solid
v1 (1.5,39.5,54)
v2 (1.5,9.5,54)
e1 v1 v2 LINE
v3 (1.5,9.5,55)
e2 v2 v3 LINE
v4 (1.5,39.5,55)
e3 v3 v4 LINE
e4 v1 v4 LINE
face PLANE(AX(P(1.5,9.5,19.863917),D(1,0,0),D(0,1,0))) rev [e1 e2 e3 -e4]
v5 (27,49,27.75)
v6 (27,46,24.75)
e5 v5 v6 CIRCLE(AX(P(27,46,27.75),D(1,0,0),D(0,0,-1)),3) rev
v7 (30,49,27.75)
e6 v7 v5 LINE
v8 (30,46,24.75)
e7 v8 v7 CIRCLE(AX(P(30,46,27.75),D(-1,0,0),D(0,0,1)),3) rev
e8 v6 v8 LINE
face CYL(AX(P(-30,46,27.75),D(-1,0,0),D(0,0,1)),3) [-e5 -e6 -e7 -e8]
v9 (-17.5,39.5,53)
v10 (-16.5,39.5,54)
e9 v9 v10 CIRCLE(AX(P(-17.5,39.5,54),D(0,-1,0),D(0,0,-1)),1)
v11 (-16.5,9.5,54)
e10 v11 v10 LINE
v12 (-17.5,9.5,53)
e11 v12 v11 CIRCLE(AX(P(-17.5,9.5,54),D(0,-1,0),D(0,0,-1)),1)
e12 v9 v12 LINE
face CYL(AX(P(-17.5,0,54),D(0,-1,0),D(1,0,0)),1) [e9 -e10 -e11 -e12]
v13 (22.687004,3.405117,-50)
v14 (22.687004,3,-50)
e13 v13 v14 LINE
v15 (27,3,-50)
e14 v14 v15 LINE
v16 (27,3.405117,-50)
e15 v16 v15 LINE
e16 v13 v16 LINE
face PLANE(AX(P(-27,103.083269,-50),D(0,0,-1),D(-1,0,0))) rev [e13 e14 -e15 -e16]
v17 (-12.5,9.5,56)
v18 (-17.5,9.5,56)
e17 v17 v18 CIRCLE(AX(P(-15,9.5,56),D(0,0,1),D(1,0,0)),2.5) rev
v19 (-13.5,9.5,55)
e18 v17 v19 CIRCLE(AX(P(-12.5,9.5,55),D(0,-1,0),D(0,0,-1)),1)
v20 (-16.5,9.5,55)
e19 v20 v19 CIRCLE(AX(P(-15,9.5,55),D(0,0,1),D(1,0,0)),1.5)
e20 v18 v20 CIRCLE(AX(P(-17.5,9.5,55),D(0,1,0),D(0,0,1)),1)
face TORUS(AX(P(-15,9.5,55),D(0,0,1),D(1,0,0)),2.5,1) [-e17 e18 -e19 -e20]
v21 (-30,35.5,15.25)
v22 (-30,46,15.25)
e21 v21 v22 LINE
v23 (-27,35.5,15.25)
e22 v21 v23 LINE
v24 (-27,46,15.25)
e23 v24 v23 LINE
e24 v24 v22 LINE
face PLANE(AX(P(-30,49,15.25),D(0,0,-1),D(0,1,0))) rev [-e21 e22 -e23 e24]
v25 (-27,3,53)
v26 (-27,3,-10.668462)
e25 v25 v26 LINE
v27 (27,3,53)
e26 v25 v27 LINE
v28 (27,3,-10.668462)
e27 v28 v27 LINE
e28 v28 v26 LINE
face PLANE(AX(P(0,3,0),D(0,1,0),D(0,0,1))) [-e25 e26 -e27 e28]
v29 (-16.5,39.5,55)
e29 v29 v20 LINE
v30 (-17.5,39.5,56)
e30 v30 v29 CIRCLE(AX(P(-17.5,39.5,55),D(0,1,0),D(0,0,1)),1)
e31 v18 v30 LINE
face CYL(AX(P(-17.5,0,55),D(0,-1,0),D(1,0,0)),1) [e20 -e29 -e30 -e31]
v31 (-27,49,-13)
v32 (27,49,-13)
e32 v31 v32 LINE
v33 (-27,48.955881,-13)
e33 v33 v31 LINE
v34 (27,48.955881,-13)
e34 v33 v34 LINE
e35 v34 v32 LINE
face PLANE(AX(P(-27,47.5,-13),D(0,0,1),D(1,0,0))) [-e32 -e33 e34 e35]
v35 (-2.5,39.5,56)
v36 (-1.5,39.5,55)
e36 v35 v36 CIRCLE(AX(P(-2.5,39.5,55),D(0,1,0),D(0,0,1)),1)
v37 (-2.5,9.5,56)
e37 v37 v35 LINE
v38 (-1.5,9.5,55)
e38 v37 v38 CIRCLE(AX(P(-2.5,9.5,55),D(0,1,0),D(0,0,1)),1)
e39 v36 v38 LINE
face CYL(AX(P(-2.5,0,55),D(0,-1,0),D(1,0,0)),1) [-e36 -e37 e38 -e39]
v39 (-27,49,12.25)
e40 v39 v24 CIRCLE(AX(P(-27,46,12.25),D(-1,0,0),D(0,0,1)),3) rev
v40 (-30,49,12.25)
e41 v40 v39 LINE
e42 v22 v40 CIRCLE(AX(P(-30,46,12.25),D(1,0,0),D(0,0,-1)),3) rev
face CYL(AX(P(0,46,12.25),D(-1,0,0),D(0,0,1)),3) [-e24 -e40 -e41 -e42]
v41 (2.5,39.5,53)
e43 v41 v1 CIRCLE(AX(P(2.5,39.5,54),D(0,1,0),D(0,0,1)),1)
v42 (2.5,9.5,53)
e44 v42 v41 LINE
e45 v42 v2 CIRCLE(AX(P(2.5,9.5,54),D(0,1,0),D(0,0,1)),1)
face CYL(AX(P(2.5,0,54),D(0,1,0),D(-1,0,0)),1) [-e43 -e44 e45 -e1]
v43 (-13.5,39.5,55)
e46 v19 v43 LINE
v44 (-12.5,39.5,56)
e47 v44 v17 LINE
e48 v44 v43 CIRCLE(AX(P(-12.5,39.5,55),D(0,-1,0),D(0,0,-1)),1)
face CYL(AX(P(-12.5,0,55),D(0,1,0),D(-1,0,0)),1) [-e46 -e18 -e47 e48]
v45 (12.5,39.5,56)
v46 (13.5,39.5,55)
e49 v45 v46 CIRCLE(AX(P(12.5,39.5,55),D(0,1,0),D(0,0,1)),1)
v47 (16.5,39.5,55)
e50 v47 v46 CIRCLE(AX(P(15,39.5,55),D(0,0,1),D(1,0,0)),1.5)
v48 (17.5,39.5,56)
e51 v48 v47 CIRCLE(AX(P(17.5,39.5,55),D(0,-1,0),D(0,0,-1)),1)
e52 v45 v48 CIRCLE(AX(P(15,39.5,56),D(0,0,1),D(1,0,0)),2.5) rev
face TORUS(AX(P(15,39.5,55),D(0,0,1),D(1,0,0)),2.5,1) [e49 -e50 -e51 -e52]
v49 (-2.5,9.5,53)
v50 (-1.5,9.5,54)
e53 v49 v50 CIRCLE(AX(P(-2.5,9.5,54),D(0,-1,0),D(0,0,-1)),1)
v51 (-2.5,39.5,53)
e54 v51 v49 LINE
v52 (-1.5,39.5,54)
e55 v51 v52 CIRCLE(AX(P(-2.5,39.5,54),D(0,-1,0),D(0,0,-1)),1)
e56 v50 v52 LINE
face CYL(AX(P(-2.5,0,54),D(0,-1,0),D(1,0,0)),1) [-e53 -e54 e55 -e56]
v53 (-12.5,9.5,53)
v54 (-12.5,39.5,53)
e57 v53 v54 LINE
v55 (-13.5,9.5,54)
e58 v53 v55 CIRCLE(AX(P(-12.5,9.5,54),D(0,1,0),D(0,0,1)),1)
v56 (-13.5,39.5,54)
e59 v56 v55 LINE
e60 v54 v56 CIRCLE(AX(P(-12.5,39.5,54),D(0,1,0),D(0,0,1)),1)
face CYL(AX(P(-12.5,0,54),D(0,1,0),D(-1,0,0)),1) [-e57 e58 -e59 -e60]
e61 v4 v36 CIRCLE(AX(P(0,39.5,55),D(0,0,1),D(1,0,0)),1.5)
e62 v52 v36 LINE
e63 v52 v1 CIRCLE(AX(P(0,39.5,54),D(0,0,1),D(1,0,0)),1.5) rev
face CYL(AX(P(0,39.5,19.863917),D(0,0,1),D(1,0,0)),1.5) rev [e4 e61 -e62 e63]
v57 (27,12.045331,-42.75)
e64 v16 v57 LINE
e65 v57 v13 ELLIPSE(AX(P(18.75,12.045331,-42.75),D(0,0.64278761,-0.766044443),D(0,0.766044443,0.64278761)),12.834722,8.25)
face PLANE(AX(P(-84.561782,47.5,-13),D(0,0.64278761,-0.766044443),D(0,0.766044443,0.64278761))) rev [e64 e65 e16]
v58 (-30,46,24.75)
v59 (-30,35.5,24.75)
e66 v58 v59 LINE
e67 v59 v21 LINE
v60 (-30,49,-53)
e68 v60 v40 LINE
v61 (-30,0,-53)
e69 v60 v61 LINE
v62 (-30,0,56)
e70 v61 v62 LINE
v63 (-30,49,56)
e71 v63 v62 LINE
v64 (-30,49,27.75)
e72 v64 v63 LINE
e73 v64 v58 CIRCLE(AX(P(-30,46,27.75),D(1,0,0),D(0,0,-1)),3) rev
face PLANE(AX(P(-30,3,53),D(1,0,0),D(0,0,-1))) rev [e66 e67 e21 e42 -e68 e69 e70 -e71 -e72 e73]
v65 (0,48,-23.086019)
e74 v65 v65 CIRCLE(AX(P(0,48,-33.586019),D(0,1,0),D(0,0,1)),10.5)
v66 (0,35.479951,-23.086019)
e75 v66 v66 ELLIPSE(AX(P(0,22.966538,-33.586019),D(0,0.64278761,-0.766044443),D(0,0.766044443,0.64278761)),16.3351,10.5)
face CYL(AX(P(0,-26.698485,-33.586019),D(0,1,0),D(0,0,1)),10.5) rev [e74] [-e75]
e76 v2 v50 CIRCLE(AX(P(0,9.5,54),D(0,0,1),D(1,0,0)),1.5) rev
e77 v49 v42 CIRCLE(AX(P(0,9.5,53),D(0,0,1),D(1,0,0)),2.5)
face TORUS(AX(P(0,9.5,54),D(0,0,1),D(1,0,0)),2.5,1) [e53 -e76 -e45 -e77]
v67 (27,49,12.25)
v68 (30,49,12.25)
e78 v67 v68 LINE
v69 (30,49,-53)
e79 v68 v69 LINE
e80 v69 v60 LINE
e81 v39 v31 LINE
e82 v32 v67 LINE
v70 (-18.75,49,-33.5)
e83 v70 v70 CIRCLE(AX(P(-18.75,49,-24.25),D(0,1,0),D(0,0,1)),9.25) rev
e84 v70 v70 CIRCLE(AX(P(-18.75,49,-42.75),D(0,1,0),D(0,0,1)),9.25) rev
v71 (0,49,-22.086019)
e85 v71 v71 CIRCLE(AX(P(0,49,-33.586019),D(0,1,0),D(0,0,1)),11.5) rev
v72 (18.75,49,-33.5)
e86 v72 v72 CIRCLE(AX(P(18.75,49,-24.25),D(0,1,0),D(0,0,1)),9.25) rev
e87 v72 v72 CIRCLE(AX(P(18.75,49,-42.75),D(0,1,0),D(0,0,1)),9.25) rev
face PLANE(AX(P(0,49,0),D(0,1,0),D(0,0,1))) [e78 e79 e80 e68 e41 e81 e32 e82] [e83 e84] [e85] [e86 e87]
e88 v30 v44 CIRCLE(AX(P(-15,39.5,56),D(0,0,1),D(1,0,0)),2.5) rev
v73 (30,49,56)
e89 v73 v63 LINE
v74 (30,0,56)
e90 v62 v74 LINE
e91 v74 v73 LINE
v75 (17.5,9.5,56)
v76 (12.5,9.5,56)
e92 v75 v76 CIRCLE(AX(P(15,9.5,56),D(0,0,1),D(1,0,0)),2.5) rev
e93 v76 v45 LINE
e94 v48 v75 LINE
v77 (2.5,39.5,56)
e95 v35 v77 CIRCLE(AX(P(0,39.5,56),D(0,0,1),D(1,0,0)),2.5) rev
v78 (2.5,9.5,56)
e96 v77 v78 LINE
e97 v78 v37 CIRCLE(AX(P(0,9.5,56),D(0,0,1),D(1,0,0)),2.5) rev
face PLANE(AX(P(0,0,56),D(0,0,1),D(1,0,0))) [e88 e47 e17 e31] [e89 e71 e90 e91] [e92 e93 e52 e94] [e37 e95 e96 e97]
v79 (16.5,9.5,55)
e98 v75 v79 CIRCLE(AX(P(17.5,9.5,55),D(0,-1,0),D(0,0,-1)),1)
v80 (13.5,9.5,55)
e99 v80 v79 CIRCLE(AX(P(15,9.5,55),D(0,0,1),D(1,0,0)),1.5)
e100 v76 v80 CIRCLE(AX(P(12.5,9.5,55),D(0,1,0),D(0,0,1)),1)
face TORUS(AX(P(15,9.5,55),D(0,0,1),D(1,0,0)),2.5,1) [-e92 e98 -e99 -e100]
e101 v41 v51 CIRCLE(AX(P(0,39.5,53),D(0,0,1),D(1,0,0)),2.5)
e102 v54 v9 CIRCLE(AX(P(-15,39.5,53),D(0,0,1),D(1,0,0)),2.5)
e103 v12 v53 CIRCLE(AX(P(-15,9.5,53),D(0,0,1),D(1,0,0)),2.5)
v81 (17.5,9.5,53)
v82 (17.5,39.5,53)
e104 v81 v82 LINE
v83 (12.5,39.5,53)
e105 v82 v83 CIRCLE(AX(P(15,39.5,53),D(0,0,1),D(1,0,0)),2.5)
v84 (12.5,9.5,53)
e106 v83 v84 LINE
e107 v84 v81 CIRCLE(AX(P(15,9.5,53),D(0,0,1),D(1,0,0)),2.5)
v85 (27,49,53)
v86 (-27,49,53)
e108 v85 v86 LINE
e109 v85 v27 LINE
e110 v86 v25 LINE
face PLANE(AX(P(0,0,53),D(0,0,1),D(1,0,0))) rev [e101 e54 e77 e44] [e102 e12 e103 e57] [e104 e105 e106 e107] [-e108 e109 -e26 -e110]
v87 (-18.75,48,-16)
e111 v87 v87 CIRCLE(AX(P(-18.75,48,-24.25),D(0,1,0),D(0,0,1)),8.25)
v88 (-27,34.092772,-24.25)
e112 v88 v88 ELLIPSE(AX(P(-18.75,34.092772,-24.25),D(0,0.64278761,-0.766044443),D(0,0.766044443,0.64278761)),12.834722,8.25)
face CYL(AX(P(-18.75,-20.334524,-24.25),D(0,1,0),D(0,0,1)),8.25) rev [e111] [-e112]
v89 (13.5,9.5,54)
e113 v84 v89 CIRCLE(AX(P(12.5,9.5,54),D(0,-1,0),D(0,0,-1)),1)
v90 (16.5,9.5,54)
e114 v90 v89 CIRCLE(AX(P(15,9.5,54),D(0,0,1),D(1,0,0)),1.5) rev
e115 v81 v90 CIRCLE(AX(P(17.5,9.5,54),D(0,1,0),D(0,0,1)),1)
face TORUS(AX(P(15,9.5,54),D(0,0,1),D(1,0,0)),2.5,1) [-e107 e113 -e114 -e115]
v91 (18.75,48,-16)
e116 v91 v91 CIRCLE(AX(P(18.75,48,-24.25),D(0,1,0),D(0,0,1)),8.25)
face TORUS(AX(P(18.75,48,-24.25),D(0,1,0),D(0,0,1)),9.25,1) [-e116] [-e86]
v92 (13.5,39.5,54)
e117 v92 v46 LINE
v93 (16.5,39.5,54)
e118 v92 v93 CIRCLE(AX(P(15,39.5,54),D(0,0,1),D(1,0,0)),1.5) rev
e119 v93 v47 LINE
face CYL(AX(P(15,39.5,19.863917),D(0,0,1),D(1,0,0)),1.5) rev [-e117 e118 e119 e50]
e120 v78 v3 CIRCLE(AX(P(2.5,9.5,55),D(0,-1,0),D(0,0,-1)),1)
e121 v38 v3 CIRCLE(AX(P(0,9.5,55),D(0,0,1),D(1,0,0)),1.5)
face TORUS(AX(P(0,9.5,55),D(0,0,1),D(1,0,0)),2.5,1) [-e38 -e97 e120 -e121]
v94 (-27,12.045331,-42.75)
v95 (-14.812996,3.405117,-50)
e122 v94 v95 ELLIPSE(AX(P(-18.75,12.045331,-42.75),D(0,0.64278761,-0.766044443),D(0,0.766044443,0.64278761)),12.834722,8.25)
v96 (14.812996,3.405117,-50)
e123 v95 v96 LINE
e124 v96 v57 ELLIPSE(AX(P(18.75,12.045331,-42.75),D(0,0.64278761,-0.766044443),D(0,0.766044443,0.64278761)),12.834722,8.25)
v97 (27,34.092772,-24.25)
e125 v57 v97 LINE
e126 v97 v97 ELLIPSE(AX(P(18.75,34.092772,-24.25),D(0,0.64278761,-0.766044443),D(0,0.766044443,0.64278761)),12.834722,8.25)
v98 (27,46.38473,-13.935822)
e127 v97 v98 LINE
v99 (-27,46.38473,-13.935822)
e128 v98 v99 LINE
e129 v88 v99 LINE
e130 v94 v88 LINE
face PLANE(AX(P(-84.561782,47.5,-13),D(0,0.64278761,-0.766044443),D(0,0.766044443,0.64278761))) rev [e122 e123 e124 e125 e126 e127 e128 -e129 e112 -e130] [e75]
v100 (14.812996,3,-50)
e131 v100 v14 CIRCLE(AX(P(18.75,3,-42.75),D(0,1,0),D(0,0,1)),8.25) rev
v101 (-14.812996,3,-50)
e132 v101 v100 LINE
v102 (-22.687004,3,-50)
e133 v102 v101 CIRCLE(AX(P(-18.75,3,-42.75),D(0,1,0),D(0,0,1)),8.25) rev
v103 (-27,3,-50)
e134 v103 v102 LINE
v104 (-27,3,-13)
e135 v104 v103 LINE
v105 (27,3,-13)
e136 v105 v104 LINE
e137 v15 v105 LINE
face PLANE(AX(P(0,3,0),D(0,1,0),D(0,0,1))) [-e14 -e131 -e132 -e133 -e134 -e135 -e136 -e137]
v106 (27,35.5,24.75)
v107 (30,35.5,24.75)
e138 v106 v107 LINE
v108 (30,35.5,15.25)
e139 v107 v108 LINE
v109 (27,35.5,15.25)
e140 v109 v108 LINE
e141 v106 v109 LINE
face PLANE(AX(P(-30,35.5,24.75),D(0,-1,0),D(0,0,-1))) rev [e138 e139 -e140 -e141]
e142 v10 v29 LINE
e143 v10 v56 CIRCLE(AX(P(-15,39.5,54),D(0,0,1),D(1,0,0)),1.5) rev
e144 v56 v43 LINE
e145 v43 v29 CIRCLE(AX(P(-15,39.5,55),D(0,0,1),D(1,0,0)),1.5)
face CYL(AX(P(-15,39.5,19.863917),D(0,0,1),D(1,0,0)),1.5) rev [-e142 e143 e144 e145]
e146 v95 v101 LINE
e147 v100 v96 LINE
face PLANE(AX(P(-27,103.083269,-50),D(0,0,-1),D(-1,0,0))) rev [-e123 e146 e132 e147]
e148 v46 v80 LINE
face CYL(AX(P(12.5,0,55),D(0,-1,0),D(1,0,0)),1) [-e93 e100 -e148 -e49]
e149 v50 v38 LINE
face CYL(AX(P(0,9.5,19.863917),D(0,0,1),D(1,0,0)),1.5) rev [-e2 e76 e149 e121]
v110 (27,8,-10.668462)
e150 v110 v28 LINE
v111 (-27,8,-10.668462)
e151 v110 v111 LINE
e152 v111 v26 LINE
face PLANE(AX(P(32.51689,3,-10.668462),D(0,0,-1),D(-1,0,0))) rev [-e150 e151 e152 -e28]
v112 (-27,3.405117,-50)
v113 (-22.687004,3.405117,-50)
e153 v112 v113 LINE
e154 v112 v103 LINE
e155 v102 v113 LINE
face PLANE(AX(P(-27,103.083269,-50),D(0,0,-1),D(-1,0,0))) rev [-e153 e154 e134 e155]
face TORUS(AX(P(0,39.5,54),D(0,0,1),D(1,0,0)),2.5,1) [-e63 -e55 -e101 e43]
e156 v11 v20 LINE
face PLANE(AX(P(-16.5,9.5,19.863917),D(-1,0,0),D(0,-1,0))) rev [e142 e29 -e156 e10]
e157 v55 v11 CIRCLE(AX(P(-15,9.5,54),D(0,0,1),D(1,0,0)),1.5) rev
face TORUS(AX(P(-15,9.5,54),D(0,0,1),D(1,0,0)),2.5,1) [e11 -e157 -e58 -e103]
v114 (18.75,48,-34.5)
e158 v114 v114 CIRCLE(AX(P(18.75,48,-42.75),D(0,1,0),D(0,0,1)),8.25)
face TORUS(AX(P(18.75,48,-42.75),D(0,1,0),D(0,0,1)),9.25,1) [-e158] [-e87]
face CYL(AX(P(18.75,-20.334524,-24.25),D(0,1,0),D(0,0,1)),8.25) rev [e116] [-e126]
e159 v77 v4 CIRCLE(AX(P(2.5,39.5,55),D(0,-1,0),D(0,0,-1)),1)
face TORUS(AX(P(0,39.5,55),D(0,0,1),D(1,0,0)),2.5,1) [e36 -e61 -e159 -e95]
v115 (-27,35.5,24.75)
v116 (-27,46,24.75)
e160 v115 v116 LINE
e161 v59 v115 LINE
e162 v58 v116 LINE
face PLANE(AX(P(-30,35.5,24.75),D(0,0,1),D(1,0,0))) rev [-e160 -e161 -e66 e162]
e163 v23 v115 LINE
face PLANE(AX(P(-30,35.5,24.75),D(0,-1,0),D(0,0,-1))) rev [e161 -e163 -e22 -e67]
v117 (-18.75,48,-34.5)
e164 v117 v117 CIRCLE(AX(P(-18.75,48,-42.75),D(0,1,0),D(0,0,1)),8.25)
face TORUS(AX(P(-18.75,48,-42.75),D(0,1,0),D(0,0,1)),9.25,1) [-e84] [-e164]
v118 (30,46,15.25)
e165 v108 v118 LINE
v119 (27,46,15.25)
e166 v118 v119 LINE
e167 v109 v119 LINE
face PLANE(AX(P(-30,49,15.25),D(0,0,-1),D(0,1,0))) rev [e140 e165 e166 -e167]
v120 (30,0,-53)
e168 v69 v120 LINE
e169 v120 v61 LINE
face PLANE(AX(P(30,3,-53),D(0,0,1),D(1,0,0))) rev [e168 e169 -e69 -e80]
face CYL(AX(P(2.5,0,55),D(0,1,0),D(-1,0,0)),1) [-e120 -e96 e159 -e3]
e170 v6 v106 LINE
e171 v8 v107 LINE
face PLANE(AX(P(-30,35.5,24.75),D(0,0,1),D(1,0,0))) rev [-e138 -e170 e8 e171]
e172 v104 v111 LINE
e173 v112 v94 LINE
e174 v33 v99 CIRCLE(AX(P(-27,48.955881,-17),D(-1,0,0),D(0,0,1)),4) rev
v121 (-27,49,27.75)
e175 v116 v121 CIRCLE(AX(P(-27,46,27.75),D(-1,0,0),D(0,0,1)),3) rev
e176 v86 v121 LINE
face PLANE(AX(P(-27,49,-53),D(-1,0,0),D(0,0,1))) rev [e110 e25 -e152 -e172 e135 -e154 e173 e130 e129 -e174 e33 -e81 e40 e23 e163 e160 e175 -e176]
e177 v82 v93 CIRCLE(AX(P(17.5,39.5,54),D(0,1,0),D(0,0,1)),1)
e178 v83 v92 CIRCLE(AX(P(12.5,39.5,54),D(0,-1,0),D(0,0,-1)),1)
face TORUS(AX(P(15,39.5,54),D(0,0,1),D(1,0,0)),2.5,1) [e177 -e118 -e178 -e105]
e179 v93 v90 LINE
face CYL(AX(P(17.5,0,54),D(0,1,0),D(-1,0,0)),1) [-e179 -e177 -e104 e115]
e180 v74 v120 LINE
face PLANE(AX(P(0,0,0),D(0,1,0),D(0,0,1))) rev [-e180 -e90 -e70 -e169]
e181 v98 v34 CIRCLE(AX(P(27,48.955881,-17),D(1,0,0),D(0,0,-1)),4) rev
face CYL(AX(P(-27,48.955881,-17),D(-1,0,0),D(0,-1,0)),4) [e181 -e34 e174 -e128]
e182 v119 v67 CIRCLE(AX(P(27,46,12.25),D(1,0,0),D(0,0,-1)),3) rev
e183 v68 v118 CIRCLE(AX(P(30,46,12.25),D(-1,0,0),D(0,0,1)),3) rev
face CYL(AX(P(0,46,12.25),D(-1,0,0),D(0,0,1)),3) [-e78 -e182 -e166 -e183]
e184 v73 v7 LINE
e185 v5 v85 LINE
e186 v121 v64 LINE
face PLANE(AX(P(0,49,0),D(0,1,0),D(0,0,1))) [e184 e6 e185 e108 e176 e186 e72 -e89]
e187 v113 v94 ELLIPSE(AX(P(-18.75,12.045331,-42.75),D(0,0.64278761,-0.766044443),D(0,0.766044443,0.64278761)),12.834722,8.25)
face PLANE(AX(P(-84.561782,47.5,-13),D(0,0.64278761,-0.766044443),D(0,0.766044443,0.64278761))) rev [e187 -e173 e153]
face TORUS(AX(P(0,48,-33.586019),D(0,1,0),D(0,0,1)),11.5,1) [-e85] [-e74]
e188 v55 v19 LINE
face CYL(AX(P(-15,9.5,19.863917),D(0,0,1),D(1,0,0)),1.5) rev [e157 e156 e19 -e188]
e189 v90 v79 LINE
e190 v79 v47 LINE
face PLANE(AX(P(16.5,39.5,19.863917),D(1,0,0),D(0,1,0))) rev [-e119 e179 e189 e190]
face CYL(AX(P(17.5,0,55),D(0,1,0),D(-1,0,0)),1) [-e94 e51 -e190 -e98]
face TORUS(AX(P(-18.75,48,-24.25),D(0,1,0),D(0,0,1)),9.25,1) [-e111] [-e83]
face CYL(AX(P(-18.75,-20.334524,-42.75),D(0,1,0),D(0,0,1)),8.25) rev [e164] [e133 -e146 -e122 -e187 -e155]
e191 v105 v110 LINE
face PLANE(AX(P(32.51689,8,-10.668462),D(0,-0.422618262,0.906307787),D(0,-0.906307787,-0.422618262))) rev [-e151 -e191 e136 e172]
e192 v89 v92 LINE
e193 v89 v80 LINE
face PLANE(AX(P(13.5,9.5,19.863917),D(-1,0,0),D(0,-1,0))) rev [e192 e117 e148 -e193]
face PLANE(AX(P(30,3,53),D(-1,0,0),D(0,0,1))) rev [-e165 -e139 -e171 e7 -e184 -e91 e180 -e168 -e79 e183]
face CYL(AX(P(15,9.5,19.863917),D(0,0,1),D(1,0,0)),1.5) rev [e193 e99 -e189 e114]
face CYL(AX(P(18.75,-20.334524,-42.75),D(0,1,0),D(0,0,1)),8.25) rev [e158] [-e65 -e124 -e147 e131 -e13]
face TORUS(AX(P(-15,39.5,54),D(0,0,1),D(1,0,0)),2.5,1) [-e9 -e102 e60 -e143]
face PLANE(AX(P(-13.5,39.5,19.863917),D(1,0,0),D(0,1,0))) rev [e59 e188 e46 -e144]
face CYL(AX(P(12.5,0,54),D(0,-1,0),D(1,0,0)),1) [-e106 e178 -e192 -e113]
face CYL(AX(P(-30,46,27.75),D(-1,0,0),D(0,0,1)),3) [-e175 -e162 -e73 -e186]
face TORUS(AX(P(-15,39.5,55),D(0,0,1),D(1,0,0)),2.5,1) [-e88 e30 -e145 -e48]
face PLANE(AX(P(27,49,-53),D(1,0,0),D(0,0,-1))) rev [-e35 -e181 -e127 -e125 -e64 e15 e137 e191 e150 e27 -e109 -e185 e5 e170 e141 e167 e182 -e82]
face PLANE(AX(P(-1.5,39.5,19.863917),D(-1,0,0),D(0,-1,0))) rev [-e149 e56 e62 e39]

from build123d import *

# Parameters (mm, degrees)
BASE_PLATE_W              = 60
BASE_PLATE_H              = 106
BASE_DEPTH                = 3
SKETCH3_W                 = 3
SKETCH3_H                 = 106
BOSS_EXTRUDE2_DEPTH       = 46
SKETCH5_W                 = 54
SKETCH5_H                 = 3
BOSS_EXTRUDE3_DEPTH       = 46
SKETCH4_W                 = 54
SKETCH4_H                 = 37
BOSS_EXTRUDE4_DEPTH       = 1.5
BOSS_EXTRUDE5_DEPTH       = 54
CUT_EXTRUDE1_REACH        = 80.166
FLUXPENS_R                = 8.25
FILLET1_R                 = 1
FILLET3_R                 = 1
FILLET18_R                = 1
FILLET19_R                = 1
ROLLER_CUT_OUT_DEPTH      = 92.972822073
ROLLER_CUT_OUT_DEPTH_BACK = 92.972822073
SKETCH12_W                = 9.5
SKETCH12_H                = 13.5
SKETCH13_W                = 60
SKETCH13_H                = 49
BOSS_EXTRUDE6_DEPTH       = 3
CUT_EXTRUDE6_DEPTH        = 3
FILLET7_R                 = 1
FILLET8_R                 = 1
FILLET9_R                 = 1
FILLET10_R                = 3
FILLET11_R                = 3
FILLET12_R                = 3
FILLET13_R                = 3
FILLET14_R                = 4
FILLET15_R                = 1
FILLET16_R                = 1
FILLET17_R                = 1
TOOL_CATCHER_DEPTH        = 54
CUT_EXTRUDE7_REACH        = 82.231
SKETCH17_R                = 10.5
FILLET20_R                = 1


with BuildPart() as part:
    # Base Plate → Base (new body)
    with BuildSketch(Plane(origin=(0, 0, 0), x_dir=(1, 0, 0), z_dir=(0, 1, 0))):
        Rectangle(BASE_PLATE_W, BASE_PLATE_H)
    extrude(amount=BASE_DEPTH)

    # Sketch3 → Boss-Extrude2 (add)
    with BuildSketch(Plane(origin=(0, 3, 0), x_dir=(1, 0, 0), z_dir=(0, 1, 0))):
        with Locations((-28.5, 0)):
            Rectangle(SKETCH3_W, SKETCH3_H)
        with Locations((28.5, 0)):
            Rectangle(SKETCH3_W, SKETCH3_H)
    extrude(amount=BOSS_EXTRUDE2_DEPTH)

    # Sketch5 → Boss-Extrude3 (add)
    with BuildSketch(Plane(origin=(0, 3, 0), x_dir=(1, 0, 0), z_dir=(0, 1, 0))):
        with Locations((0, 51.5)):
            Rectangle(SKETCH5_W, SKETCH5_H)
    extrude(amount=BOSS_EXTRUDE3_DEPTH)

    # Sketch4 → Boss-Extrude4 (add)
    with BuildSketch(Plane(origin=(0, 49, 0), x_dir=(1, 0, 0), z_dir=(0, 1, 0))):
        with Locations((0, 31.5)):
            Rectangle(SKETCH4_W, SKETCH4_H)
    extrude(amount=-BOSS_EXTRUDE4_DEPTH)

    # Sketch7 → Boss-Extrude5 (add)
    with BuildSketch(Plane.ZY.offset(-27)):
        Polygon((-50, 47.5), (-13, 47.5), (-50, 3.405117074), align=None)
    extrude(amount=BOSS_EXTRUDE5_DEPTH)

    # Cut-Extrude1: up to this face of the body (flat: up to its plane)
    cut_extrude1_end = Plane(part.part.faces().sort_by_distance((0, 3, 1.5))[0])
    # FluxPens → Cut-Extrude1 (cut, up to the picked face)
    with BuildSketch(Plane(origin=(0, 49, 0), x_dir=(1, 0, 0), z_dir=(0, 1, 0)), mode=Mode.PRIVATE) as cut_extrude1_sk1:
        with Locations(Location((-18.75, 42.75, 0), (0, 0, 270))):
            Circle(FLUXPENS_R)
    cut_extrude1_tool1 = split(extrude(cut_extrude1_sk1.sketch, amount=-CUT_EXTRUDE1_REACH, mode=Mode.PRIVATE), bisect_by=cut_extrude1_end, keep=Keep.BOTH, mode=Mode.PRIVATE)
    # FluxPens → Cut-Extrude1 (cut, up to the picked face)
    with BuildSketch(Plane(origin=(0, 49, 0), x_dir=(1, 0, 0), z_dir=(0, 1, 0)), mode=Mode.PRIVATE) as cut_extrude1_sk2:
        with Locations(Location((-18.75, 24.25, 0), (0, 0, 270))):
            Circle(FLUXPENS_R)
    cut_extrude1_tool2 = split(extrude(cut_extrude1_sk2.sketch, amount=-CUT_EXTRUDE1_REACH, mode=Mode.PRIVATE), bisect_by=cut_extrude1_end, keep=Keep.BOTH, mode=Mode.PRIVATE)
    # FluxPens → Cut-Extrude1 (cut, up to the picked face)
    with BuildSketch(Plane(origin=(0, 49, 0), x_dir=(1, 0, 0), z_dir=(0, 1, 0)), mode=Mode.PRIVATE) as cut_extrude1_sk3:
        with Locations((18.75, 24.25)):
            Circle(FLUXPENS_R)
    cut_extrude1_tool3 = split(extrude(cut_extrude1_sk3.sketch, amount=-CUT_EXTRUDE1_REACH, mode=Mode.PRIVATE), bisect_by=cut_extrude1_end, keep=Keep.BOTH, mode=Mode.PRIVATE)
    # FluxPens → Cut-Extrude1 (cut, up to the picked face)
    with BuildSketch(Plane(origin=(0, 49, 0), x_dir=(1, 0, 0), z_dir=(0, 1, 0)), mode=Mode.PRIVATE) as cut_extrude1_sk4:
        with Locations((18.75, 42.75)):
            Circle(FLUXPENS_R)
    cut_extrude1_tool4 = split(extrude(cut_extrude1_sk4.sketch, amount=-CUT_EXTRUDE1_REACH, mode=Mode.PRIVATE), bisect_by=cut_extrude1_end, keep=Keep.BOTH, mode=Mode.PRIVATE)
    add(cut_extrude1_tool1.solids().sort_by(Axis((-18.75, 49, -42.75), (0, -1, 0)))[0], mode=Mode.SUBTRACT)
    add(cut_extrude1_tool2.solids().sort_by(Axis((-18.75, 49, -24.25), (0, -1, 0)))[0], mode=Mode.SUBTRACT)
    add(cut_extrude1_tool3.solids().sort_by(Axis((18.75, 49, -24.25), (0, -1, 0)))[0], mode=Mode.SUBTRACT)
    add(cut_extrude1_tool4.solids().sort_by(Axis((18.75, 49, -42.75), (0, -1, 0)))[0], mode=Mode.SUBTRACT)

    # Fillet1
    fillet1_edges = [part.edges().sort_by_distance(p)[0] for p in [
        (-18.75, 49, -51),
    ]]
    fillet(fillet1_edges, radius=FILLET1_R)

    # Fillet3
    fillet3_edges = [part.edges().sort_by_distance(p)[0] for p in [
        (-18.75, 49, -32.5),
    ]]
    fillet(fillet3_edges, radius=FILLET3_R - 0.0001)  # a hair under: the kernel refuses the full size

    # Fillet18
    fillet18_edges = [part.edges().sort_by_distance(p)[0] for p in [
        (10.5, 49, -42.75),
    ]]
    fillet(fillet18_edges, radius=FILLET18_R)

    # Fillet19
    fillet19_edges = [part.edges().sort_by_distance(p)[0] for p in [
        (10.5, 49, -24.25),
    ]]
    fillet(fillet19_edges, radius=FILLET19_R - 0.0001)  # a hair under: the kernel refuses the full size

    # Sketch12 → Roller Cut Out (cut, two sides: drawn at the far end of the back side and taken through both)
    with BuildSketch(Plane(origin=(-27, 0, 0), x_dir=(0, 0, -1), z_dir=(1, 0, 0)).offset(-ROLLER_CUT_OUT_DEPTH_BACK)):
        with Locations((-20, 42.25)):
            Rectangle(SKETCH12_W, SKETCH12_H)
    extrude(amount=ROLLER_CUT_OUT_DEPTH + ROLLER_CUT_OUT_DEPTH_BACK, mode=Mode.SUBTRACT)

    # Sketch13 → Boss-Extrude6 (add)
    with BuildSketch(Plane.XY.offset(53)):
        with Locations((0, 24.5)):
            Rectangle(SKETCH13_W, SKETCH13_H)
    extrude(amount=BOSS_EXTRUDE6_DEPTH)

    # Sketch14 → Cut-Extrude6 (cut)
    with BuildSketch(Plane.XY.offset(56)):
        with BuildLine():
            Line((-16.5, 9.5), (-16.5, 39.5))
            ThreePointArc((-16.5, 39.5), (-15, 41), (-13.5, 39.5))
            Line((-13.5, 39.5), (-13.5, 9.5))
            ThreePointArc((-13.5, 9.5), (-15, 8), (-16.5, 9.5))
        make_face()
        with BuildLine():
            Line((13.5, 9.5), (13.5, 39.5))
            ThreePointArc((13.5, 39.5), (15, 41), (16.5, 39.5))
            Line((16.5, 39.5), (16.5, 9.5))
            ThreePointArc((16.5, 9.5), (15, 8), (13.5, 9.5))
        make_face()
        with BuildLine():
            Line((-1.5, 39.5), (-1.5, 9.5))
            ThreePointArc((-1.5, 9.5), (0, 8), (1.5, 9.5))
            Line((1.5, 9.5), (1.5, 39.5))
            ThreePointArc((1.5, 39.5), (0, 41), (-1.5, 39.5))
        make_face()
    extrude(amount=-CUT_EXTRUDE6_DEPTH, mode=Mode.SUBTRACT)

    # Fillet7
    fillet7_edges = [part.edges().sort_by_distance(p)[0] for p in [
        (-15, 8, 53),
        (-16.5, 24.5, 53),
        (-15, 41, 53),
        (-13.5, 24.5, 53),
    ]]
    fillet(fillet7_edges, radius=FILLET7_R)

    # Fillet8
    fillet8_edges = [part.edges().sort_by_distance(p)[0] for p in [
        (0, 41, 53),
        (1.5, 24.5, 53),
        (0, 8, 53),
        (-1.5, 24.5, 53),
    ]]
    fillet(fillet8_edges, radius=FILLET8_R)

    # Fillet9
    fillet9_edges = [part.edges().sort_by_distance(p)[0] for p in [
        (15, 8, 53),
        (13.5, 24.5, 53),
        (15, 41, 53),
        (16.5, 24.5, 53),
    ]]
    fillet(fillet9_edges, radius=FILLET9_R)

    # Fillet10
    fillet10_edges = [part.edges().sort_by_distance(p)[0] for p in [
        (-28.5, 49, 15.25),
    ]]
    fillet(fillet10_edges, radius=FILLET10_R)

    # Fillet11
    fillet11_edges = [part.edges().sort_by_distance(p)[0] for p in [
        (-28.5, 49, 24.75),
    ]]
    fillet(fillet11_edges, radius=FILLET11_R)

    # Fillet12
    fillet12_edges = [part.edges().sort_by_distance(p)[0] for p in [
        (28.5, 49, 15.25),
    ]]
    fillet(fillet12_edges, radius=FILLET12_R)

    # Fillet13
    fillet13_edges = [part.edges().sort_by_distance(p)[0] for p in [
        (28.5, 49, 24.75),
    ]]
    fillet(fillet13_edges, radius=FILLET13_R)

    # Fillet14
    fillet14_edges = [part.edges().sort_by_distance(p)[0] for p in [
        (0, 47.5, -13),
    ]]
    fillet(fillet14_edges, radius=FILLET14_R)

    # Fillet15
    fillet15_edges = [part.edges().sort_by_distance(p)[0] for p in [
        (0, 41, 56),
        (-1.5, 24.5, 56),
        (0, 8, 56),
        (1.5, 24.5, 56),
    ]]
    fillet(fillet15_edges, radius=FILLET15_R)

    # Fillet16
    fillet16_edges = [part.edges().sort_by_distance(p)[0] for p in [
        (-15, 8, 56),
        (-13.5, 24.5, 56),
        (-15, 41, 56),
        (-16.5, 24.5, 56),
    ]]
    fillet(fillet16_edges, radius=FILLET16_R)

    # Fillet17
    fillet17_edges = [part.edges().sort_by_distance(p)[0] for p in [
        (15, 8, 56),
        (16.5, 24.5, 56),
        (15, 41, 56),
        (13.5, 24.5, 56),
    ]]
    fillet(fillet17_edges, radius=FILLET17_R)

    # Sketch16 → Tool Catcher (add)
    with BuildSketch(Plane(origin=(-27, 0, 0), x_dir=(0, 0, -1), z_dir=(1, 0, 0))):
        Polygon((10.668461709, 3), (10.668461709, 8), (13, 3), align=None)
    extrude(amount=TOOL_CATCHER_DEPTH)

    # Cut-Extrude7: up to this plane
    cut_extrude7_end = Plane(origin=(-84.561781594, 47.5, -13), z_dir=(0, 0.6427876096865348, -0.7660444431189817))
    # Sketch17 → Cut-Extrude7 (cut, up to the surface)
    with BuildSketch(Plane(origin=(0, 49, 0), x_dir=(1, 0, 0), z_dir=(0, 1, 0)), mode=Mode.PRIVATE) as cut_extrude7_sk1:
        with Locations(Location((0, 33.58601859, 0), (0, 0, 270))):
            Circle(SKETCH17_R)
    cut_extrude7_tool1 = split(extrude(cut_extrude7_sk1.sketch, amount=-CUT_EXTRUDE7_REACH, mode=Mode.PRIVATE), bisect_by=cut_extrude7_end, keep=Keep.BOTH, mode=Mode.PRIVATE)
    add(cut_extrude7_tool1.solids().sort_by_distance((0, 49, -33.586019))[0], mode=Mode.SUBTRACT)

    # Fillet20
    fillet20_edges = [part.edges().sort_by_distance(p)[0] for p in [
        (0, 49, -44.08601859),
    ]]
    fillet(fillet20_edges, radius=FILLET20_R)


solid = part.part
